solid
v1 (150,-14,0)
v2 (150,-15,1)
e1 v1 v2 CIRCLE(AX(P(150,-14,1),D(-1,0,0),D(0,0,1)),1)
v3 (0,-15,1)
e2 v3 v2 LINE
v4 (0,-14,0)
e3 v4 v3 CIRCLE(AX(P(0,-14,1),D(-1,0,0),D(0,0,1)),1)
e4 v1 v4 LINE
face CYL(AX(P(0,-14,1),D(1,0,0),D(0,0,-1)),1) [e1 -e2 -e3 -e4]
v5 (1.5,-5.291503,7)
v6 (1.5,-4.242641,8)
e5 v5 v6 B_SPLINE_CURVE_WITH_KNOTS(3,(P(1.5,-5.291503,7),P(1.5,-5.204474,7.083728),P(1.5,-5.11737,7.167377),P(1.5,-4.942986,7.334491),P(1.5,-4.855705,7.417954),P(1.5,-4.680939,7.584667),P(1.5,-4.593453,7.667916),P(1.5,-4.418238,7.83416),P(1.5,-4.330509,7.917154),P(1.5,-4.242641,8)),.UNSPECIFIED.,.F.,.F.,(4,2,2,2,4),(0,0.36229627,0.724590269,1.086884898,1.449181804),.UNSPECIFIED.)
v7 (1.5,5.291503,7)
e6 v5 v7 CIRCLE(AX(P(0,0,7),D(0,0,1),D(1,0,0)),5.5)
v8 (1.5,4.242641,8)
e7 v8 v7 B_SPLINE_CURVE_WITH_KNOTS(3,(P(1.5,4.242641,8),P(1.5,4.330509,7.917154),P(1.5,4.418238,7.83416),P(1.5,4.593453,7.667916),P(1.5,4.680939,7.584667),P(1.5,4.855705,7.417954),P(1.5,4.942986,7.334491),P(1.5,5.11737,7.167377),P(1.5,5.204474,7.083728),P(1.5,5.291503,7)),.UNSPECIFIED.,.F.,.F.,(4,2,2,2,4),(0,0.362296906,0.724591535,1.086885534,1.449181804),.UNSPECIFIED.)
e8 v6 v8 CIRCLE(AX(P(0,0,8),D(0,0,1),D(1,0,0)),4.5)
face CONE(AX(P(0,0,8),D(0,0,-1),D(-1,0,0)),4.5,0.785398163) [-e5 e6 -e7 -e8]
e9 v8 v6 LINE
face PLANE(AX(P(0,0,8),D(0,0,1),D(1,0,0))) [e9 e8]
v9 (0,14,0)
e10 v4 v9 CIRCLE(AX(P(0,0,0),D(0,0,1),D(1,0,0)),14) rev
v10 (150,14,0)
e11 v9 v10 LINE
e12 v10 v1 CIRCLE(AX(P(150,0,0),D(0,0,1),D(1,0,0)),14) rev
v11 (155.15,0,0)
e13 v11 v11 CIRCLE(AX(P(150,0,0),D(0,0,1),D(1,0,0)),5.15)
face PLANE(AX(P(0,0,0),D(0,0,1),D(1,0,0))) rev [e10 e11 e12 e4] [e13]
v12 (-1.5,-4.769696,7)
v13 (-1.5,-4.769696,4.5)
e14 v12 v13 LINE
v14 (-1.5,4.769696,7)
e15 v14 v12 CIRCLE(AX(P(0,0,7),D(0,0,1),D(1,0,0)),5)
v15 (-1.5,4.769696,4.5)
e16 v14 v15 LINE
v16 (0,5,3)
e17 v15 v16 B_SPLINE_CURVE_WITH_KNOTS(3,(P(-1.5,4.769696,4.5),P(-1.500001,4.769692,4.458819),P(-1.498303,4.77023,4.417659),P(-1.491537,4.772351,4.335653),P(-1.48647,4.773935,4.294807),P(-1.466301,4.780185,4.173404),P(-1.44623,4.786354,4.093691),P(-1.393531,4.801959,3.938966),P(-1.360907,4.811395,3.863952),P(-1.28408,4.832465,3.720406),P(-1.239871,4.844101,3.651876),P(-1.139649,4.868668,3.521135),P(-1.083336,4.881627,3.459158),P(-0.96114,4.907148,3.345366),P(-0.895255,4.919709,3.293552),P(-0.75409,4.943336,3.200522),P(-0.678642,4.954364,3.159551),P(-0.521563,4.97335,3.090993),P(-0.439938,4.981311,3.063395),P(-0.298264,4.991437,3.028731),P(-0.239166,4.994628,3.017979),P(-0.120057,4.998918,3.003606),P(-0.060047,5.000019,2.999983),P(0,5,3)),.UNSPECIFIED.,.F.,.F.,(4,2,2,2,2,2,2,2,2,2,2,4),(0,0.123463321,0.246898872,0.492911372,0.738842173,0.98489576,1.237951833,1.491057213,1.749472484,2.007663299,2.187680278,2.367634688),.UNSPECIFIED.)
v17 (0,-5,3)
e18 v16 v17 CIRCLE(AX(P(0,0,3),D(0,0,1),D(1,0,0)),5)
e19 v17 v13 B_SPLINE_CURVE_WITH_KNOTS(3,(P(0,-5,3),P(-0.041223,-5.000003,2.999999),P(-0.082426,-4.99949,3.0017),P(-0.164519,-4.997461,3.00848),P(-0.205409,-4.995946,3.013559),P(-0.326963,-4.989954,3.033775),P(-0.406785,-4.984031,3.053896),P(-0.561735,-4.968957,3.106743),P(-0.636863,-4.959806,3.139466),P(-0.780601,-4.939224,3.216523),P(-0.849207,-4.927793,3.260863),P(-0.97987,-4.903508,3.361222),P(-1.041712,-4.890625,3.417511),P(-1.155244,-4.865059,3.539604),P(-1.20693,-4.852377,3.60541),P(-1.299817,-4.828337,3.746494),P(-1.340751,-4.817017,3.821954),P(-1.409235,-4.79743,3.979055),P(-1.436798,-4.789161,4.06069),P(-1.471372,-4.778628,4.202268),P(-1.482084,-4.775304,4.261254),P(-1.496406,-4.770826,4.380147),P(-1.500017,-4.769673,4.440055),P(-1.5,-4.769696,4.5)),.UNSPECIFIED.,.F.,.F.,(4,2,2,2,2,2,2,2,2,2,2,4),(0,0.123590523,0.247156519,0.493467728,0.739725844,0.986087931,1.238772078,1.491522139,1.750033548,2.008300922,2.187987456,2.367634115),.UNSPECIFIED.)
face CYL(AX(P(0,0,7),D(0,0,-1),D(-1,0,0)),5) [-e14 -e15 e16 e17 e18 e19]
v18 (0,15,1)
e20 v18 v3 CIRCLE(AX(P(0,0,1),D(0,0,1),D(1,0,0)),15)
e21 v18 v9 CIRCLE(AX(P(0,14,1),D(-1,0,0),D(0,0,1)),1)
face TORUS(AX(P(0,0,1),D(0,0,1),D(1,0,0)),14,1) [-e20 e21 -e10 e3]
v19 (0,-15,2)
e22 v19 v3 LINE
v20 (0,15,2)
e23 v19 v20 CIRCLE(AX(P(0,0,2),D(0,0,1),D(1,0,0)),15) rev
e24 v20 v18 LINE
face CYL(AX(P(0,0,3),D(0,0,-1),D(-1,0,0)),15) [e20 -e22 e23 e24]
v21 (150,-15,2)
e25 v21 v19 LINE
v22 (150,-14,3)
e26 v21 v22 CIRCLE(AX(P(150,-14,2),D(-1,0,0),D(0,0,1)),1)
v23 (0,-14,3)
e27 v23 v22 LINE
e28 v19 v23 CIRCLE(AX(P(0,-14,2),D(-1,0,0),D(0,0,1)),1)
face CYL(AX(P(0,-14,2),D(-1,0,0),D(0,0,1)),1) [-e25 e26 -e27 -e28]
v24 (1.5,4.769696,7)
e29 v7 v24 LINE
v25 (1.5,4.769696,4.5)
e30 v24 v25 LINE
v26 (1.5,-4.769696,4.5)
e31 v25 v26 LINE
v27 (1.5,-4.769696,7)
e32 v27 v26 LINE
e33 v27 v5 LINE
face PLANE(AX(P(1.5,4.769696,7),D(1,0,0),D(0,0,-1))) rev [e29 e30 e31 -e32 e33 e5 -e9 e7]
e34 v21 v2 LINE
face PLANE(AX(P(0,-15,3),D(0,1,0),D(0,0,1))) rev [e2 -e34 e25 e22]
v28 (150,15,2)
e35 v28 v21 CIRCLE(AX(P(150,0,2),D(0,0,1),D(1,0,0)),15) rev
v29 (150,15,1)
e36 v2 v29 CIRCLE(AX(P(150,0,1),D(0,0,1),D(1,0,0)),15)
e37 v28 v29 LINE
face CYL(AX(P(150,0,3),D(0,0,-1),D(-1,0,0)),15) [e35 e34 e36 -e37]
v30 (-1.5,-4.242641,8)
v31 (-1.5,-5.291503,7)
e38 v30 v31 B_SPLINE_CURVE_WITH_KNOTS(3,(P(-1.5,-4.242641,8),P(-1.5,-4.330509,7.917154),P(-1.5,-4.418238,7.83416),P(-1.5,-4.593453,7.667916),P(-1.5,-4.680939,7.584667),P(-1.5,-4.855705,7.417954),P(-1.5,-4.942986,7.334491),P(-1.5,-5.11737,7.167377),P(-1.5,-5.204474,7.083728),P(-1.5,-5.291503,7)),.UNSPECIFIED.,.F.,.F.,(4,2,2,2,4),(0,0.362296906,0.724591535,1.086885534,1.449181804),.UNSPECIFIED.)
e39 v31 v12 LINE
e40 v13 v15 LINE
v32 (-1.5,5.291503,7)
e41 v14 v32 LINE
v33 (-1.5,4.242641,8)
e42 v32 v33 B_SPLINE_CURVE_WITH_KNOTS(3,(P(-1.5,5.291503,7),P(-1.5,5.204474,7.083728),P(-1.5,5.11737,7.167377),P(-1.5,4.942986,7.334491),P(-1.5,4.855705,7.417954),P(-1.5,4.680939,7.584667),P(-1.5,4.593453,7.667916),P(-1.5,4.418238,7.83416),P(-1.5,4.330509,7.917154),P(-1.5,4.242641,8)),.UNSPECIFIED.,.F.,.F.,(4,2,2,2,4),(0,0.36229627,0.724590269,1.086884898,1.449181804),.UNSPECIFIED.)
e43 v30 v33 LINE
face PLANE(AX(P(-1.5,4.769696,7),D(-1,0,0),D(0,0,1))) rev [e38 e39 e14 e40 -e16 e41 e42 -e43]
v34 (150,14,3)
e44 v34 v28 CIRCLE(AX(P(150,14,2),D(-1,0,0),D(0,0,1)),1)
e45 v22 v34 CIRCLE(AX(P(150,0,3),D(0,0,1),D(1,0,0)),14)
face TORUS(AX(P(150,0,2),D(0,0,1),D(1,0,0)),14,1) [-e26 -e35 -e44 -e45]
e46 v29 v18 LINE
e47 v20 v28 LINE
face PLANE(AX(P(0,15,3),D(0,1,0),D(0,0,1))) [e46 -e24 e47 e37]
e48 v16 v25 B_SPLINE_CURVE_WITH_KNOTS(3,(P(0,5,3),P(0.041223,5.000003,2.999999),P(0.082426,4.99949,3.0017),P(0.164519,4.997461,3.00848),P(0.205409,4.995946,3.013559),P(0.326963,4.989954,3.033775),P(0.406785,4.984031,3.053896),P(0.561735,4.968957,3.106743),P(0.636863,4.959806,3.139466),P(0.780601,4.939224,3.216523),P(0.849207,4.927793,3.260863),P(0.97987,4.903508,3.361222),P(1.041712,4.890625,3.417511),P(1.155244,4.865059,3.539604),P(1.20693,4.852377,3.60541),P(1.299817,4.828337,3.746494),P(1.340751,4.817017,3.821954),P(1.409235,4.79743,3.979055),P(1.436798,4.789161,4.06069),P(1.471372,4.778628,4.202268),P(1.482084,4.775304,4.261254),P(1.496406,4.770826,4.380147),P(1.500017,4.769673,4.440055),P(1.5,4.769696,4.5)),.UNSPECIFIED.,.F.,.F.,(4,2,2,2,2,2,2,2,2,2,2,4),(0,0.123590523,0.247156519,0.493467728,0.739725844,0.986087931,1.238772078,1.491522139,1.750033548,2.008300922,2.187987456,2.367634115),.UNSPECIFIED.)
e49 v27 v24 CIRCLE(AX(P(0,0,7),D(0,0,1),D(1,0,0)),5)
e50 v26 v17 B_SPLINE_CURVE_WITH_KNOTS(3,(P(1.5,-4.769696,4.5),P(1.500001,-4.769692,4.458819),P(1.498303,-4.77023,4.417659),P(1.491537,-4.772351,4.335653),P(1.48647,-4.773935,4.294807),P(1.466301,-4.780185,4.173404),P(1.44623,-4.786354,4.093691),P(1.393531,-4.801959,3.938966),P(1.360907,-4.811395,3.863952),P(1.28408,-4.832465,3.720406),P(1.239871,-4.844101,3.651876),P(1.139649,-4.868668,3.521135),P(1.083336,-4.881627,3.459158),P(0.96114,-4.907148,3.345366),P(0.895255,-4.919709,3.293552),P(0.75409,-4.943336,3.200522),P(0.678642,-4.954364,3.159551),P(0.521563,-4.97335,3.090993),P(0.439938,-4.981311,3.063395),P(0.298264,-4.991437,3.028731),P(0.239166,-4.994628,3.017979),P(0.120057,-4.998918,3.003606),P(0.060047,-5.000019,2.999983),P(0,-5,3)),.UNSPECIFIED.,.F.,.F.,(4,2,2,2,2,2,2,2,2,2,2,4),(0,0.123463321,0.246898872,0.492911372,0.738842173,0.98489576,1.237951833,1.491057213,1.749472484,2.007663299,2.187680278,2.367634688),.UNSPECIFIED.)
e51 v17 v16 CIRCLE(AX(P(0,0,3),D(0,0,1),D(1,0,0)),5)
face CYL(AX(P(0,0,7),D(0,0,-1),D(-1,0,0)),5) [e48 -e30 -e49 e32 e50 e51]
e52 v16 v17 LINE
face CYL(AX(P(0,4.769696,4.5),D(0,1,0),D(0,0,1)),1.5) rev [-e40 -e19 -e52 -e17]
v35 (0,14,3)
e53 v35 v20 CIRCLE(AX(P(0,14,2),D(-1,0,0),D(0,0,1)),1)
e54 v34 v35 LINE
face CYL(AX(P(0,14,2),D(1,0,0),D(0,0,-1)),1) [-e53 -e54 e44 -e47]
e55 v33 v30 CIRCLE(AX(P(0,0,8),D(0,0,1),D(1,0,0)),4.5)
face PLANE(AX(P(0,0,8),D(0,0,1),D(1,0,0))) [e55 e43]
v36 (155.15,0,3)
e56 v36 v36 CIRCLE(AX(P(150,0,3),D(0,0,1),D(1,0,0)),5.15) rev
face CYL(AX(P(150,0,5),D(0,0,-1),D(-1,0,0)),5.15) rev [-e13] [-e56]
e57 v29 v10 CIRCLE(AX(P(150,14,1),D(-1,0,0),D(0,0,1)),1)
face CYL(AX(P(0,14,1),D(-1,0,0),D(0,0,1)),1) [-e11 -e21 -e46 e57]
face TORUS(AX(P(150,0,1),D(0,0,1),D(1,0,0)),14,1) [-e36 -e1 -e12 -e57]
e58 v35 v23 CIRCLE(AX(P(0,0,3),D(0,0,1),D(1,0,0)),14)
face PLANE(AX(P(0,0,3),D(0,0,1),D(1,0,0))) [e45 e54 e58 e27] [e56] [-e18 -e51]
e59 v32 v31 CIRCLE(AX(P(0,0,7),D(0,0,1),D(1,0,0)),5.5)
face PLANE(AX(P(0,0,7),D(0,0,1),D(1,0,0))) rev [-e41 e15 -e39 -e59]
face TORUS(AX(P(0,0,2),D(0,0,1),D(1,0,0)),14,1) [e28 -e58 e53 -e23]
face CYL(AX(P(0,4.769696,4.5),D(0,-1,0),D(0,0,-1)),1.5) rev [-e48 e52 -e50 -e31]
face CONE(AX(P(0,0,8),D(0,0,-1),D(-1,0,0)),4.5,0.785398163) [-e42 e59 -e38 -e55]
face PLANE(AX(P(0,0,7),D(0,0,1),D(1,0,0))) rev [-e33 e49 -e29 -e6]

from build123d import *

# Parameters (mm, degrees)
EXTRUDE_1_DEPTH     = 3
EXTRUDE_2_DEPTH     = 4
EXTRUDE_3_DEPTH     = 1
CHAMFER_1_SIZE      = 1
SKETCH_1_3_R        = 5.15
CUT_EXTRUDE_1_DEPTH = 5
FILLET_1_R          = 1.5
FILLET_2_R          = 1


with BuildPart() as part:
    # 草图1 → 凸台-拉伸1 (new body)
    with BuildSketch(Plane.XY):
        with BuildLine():
            Line((0, 15), (150, 15))
            ThreePointArc((150, 15), (165, 0), (150, -15))
            Line((150, -15), (0, -15))
            ThreePointArc((0, -15), (-15, 0), (0, 15))
        make_face()
    extrude(amount=EXTRUDE_1_DEPTH)

    # 草图2 → 凸台-拉伸2 (add)
    with BuildSketch(Plane.XY.offset(3)):
        with BuildLine():
            Line((-1.5, 4.769696007), (-1.5, -4.769696007))
            ThreePointArc((-1.5, -4.769696007), (-5, 0), (-1.5, 4.769696007))
        make_face()
        with BuildLine():
            Line((1.5, 4.769696007), (1.5, -4.769696007))
            ThreePointArc((1.5, -4.769696007), (5, 0), (1.5, 4.769696007))
        make_face()
    extrude(amount=EXTRUDE_2_DEPTH)

    # 草图5 → 凸台-拉伸3 (add)
    with BuildSketch(Plane.XY.offset(7)):
        with BuildLine():
            Line((-1.5, 5.291502622), (-1.5, -5.291502622))
            ThreePointArc((-1.5, -5.291502622), (-5.5, 0), (-1.5, 5.291502622))
        make_face()
        with BuildLine():
            Line((1.5, 5.291502622), (1.5, -5.291502622))
            ThreePointArc((1.5, -5.291502622), (5.5, 0), (1.5, 5.291502622))
        make_face()
    extrude(amount=EXTRUDE_3_DEPTH)

    # 倒角1
    chamfer_1_edges = [part.edges().sort_by_distance(p)[0] for p in [
        (5.5, 0, 8),
        (-5.5, 0, 8),
    ]]
    chamfer(chamfer_1_edges, length=CHAMFER_1_SIZE - 0.0001)  # a hair under: the kernel refuses the full size

    # 草图1<3> → 切除-拉伸1 (cut)
    with BuildSketch(Plane.XY):
        with Locations((150, 0)):
            Circle(SKETCH_1_3_R)
    extrude(amount=CUT_EXTRUDE_1_DEPTH, mode=Mode.SUBTRACT)

    # 圆角1
    fillet_1_edges = [part.edges().sort_by_distance(p)[0] for p in [
        (-1.5, 0, 3),
        (1.5, 0, 3),
    ]]
    fillet(fillet_1_edges, radius=FILLET_1_R - 0.0001)  # a hair under: the kernel refuses the full size

    # 圆角2
    fillet_2_edges = [part.edges().sort_by_distance(p)[0] for p in [
        (165, 0, 3),
        (75, 15, 3),
        (-15, 0, 3),
        (75, 15, 0),
        (165, 0, 0),
        (75, -15, 0),
        (-15, 0, 0),
        (75, -15, 3),
    ]]
    fillet(fillet_2_edges, radius=FILLET_2_R)


solid = part.part
